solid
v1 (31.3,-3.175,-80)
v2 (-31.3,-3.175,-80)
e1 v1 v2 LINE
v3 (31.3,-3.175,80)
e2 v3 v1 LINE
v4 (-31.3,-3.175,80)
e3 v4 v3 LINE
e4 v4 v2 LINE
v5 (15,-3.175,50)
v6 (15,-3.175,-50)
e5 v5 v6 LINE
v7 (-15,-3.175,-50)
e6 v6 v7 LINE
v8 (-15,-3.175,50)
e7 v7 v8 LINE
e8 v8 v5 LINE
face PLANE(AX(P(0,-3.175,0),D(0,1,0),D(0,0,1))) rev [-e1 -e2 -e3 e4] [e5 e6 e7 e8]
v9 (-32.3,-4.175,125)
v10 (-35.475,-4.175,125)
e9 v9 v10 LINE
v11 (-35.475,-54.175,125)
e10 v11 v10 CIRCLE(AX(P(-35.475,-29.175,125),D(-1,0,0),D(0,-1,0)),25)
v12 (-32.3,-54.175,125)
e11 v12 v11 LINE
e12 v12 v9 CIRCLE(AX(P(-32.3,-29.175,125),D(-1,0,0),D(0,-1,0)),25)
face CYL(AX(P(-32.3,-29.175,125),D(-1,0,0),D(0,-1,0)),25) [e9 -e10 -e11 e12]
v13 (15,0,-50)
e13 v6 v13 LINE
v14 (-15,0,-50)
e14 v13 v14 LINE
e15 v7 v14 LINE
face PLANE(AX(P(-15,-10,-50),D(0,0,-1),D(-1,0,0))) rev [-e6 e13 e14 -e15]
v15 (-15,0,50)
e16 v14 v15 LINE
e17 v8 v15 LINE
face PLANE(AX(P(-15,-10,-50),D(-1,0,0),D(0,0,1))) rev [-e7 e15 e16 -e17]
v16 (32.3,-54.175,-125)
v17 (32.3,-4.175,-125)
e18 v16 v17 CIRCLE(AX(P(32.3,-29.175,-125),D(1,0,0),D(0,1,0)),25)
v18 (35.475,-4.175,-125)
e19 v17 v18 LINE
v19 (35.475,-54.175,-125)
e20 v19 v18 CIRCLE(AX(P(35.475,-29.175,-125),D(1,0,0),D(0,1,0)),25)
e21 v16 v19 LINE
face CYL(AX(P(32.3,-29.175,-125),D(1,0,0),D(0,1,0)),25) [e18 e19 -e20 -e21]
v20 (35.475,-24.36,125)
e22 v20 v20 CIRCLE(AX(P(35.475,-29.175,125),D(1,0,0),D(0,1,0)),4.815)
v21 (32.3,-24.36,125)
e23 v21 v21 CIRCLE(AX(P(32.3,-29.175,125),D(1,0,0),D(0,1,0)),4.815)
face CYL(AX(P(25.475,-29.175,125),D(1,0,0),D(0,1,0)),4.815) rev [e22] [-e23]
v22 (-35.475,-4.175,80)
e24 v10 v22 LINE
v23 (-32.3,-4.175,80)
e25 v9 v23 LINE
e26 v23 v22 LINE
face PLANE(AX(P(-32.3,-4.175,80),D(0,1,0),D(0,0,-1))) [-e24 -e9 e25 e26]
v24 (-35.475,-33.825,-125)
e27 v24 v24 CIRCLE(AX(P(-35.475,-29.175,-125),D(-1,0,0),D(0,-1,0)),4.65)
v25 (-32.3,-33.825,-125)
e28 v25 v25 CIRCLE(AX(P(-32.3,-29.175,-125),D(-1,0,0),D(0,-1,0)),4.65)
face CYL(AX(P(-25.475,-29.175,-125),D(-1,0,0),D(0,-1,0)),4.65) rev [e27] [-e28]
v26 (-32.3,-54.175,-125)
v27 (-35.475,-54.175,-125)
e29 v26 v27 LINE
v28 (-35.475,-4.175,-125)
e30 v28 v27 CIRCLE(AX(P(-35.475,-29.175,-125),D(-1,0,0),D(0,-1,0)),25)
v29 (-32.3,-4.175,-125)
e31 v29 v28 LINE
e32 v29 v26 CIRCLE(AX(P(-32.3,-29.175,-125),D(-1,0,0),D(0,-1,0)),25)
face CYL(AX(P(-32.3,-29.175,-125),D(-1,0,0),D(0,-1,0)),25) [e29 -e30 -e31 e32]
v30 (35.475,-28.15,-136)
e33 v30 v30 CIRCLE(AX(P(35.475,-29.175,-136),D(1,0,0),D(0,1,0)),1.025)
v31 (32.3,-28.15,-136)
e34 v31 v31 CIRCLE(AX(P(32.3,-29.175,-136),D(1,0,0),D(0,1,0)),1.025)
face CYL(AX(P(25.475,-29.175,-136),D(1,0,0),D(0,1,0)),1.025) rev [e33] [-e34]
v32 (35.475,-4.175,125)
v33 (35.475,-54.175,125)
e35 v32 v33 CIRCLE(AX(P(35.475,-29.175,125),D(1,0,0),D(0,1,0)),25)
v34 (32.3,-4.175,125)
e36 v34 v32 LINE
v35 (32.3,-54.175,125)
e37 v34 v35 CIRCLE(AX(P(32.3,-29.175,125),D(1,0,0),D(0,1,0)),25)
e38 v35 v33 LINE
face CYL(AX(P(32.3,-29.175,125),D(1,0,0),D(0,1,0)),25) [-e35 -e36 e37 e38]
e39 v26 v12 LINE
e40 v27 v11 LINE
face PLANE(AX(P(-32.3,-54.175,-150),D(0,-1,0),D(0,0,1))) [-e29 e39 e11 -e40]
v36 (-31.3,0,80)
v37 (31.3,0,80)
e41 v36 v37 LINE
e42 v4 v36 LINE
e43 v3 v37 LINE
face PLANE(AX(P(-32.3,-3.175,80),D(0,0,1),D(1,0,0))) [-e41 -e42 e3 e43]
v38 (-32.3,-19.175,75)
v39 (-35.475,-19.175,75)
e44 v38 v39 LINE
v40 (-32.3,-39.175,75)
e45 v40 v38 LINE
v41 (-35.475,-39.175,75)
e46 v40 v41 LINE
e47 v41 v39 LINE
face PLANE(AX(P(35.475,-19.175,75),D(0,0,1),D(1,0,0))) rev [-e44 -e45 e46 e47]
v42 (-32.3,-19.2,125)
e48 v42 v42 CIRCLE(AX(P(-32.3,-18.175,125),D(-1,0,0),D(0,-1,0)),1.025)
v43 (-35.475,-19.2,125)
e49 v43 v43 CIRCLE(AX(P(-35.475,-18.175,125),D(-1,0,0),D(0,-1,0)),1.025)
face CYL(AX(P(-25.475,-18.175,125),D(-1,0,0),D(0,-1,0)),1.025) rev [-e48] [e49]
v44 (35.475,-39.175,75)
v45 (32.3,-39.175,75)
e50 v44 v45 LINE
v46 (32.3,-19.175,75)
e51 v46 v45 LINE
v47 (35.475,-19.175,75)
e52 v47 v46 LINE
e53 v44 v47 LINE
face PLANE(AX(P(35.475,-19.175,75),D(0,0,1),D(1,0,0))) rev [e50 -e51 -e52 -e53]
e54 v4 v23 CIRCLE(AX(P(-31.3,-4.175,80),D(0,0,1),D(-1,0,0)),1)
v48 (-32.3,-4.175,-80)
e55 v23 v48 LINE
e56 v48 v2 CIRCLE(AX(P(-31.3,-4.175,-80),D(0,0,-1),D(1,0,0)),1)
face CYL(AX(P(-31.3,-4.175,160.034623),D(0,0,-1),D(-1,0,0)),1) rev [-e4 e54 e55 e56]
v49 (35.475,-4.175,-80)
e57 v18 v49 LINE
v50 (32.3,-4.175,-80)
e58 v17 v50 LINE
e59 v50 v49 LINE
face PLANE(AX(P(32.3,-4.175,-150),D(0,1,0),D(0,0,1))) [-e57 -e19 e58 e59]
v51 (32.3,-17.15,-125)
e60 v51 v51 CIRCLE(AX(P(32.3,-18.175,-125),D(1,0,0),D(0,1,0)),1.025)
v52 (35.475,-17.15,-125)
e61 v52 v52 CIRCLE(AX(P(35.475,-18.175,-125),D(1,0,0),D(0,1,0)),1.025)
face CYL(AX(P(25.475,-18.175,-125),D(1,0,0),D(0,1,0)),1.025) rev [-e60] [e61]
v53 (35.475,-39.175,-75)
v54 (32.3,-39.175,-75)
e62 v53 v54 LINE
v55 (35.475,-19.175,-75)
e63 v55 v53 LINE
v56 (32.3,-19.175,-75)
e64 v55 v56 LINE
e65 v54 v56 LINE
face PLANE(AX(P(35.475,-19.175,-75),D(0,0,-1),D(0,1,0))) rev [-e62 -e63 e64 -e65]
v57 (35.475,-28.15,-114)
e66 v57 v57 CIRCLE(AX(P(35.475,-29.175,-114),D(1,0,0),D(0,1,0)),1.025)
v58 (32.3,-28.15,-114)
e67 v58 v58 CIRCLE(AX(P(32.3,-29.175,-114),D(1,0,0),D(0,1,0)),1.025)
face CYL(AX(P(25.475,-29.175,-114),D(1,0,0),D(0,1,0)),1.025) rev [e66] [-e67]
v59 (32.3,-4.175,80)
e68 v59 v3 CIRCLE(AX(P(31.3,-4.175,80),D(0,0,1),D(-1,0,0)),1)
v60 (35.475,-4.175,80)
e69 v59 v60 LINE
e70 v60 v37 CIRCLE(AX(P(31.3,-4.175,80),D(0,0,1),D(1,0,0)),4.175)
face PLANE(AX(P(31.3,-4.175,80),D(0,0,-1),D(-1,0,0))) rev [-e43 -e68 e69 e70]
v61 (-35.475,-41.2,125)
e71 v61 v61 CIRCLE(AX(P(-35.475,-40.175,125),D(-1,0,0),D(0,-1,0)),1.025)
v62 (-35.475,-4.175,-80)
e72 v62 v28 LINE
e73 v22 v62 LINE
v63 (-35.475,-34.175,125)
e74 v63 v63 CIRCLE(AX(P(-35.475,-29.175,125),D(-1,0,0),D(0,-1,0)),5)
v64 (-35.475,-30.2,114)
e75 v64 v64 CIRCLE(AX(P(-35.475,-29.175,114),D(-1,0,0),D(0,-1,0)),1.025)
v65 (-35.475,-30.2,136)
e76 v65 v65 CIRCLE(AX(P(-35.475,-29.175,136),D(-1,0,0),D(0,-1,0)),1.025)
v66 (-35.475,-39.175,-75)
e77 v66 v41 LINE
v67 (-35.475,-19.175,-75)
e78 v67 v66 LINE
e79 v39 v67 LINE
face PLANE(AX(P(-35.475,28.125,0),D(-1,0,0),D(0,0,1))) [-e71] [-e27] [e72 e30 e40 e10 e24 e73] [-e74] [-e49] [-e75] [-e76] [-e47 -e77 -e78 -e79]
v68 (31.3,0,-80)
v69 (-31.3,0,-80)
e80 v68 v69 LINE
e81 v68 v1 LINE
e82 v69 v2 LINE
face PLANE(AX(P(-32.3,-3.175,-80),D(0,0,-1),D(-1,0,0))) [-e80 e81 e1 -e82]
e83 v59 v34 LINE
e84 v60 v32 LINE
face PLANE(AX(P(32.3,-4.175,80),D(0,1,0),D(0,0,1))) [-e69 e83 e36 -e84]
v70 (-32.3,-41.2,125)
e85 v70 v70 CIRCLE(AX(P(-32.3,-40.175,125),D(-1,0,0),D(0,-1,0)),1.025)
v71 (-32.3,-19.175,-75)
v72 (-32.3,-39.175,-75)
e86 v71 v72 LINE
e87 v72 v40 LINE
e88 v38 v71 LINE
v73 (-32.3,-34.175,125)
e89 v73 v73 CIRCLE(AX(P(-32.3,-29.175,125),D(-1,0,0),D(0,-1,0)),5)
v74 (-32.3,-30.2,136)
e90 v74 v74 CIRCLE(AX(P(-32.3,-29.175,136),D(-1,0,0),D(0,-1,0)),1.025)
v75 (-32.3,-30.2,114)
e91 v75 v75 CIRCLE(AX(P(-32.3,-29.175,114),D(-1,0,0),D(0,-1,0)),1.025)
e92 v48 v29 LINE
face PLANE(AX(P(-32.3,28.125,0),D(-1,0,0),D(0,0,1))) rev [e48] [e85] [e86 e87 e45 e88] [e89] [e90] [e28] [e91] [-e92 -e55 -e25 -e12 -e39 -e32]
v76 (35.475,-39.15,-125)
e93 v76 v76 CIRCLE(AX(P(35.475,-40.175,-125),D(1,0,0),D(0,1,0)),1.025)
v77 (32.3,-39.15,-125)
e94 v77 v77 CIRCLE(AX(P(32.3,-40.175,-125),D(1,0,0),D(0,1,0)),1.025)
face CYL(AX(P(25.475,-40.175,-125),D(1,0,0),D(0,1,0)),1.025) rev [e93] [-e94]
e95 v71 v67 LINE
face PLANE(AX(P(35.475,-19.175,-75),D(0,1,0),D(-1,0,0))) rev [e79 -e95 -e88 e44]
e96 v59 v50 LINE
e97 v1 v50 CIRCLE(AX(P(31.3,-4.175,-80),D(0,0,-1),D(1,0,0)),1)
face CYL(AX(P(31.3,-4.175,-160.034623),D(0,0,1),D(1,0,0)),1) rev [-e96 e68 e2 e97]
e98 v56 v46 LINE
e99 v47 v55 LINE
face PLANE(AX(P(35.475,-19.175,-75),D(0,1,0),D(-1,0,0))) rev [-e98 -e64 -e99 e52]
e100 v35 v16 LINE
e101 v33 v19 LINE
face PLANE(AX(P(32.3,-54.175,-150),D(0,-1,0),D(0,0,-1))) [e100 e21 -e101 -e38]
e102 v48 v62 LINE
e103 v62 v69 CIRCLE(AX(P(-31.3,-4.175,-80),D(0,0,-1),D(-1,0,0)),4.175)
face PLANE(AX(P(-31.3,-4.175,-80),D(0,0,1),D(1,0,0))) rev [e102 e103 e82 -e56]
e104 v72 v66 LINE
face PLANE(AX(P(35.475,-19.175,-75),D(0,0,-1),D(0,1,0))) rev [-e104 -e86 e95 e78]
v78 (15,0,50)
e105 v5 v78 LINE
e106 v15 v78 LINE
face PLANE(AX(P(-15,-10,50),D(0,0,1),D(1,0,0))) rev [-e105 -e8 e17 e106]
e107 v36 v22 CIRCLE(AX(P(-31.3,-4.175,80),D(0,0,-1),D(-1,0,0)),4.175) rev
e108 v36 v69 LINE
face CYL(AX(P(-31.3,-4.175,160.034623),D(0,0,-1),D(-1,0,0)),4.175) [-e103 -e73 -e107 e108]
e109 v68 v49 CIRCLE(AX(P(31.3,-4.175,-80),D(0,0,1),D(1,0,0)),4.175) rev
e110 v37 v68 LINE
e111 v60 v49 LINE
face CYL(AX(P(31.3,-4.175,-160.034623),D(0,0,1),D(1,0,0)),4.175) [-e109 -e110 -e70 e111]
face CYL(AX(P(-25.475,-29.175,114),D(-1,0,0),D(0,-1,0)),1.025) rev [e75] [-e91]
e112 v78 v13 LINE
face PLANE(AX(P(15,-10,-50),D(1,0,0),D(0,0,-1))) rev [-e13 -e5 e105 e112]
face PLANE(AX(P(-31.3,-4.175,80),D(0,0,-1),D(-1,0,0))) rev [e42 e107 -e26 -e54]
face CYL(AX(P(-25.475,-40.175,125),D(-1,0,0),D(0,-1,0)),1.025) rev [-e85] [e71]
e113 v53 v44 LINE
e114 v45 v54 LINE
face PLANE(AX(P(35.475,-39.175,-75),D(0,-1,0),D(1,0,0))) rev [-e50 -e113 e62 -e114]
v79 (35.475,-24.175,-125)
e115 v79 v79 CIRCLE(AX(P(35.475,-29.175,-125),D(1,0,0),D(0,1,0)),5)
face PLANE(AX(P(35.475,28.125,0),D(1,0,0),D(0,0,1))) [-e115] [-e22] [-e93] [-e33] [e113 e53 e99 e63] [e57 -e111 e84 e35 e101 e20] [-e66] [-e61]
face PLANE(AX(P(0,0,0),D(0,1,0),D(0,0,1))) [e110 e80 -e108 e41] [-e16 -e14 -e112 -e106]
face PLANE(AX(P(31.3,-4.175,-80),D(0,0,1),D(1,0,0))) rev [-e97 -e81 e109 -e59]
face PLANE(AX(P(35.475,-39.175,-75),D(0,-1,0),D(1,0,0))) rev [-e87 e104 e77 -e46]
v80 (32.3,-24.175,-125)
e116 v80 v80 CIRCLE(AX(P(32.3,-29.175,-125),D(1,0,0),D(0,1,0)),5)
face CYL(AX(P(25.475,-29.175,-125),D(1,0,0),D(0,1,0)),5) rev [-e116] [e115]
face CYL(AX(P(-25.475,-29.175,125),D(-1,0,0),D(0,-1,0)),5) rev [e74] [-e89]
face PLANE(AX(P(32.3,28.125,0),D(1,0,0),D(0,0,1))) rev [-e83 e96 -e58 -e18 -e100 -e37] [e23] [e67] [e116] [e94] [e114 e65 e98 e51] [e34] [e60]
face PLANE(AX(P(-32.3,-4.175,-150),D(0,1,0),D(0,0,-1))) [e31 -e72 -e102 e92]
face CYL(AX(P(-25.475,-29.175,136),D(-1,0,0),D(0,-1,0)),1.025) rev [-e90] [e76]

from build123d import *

# Parameters (mm, degrees)
BASE_FLANGE1_DEPTH         = 3.175
SKETCHED_START             = -150
SKETCHED_BEND1_DEPTH       = 300
SKETCHED_BEND1_2_DEPTH     = 70
SKETCHED_START_2           = 80
SKETCHED_BEND1_3_DEPTH     = 70
SKETCHED_BEND1_4_OUTLINE_W = 3.175
SKETCHED_BEND1_4_OUTLINE_H = 50
SKETCHED_BEND1_4_DEPTH     = 300
SKETCHED_START_3           = -80
SKETCHED_BEND1_5_DEPTH     = 160
SKETCH7_R                  = 4.815
CUT_EXTRUDE1_DEPTH         = 10
SKETCH8_R                  = 5
SKETCH8_R_2                = 1.025
CUT_EXTRUDE2_DEPTH         = 10
SKETCH9_R                  = 4.65
SKETCH9_R_2                = 5
SKETCH9_R_3                = 1.025
CUT_EXTRUDE3_DEPTH         = 10
CUT_EXTRUDE4_DEPTH         = 175.553238655
CUT_EXTRUDE5_DEPTH         = 175.553238655
SKETCH13_W                 = 30
SKETCH13_H                 = 100
CUT_EXTRUDE6_DEPTH         = 10
SKETCH14_W                 = 150
SKETCH14_H                 = 20
CUT_EXTRUDE7_DEPTH         = 175.553238655


# Read off the part's stored shape, not the designer's step: Sketched Bend1
# Sheet-metal steps are written as plain solids
with BuildPart() as part:
    # Sketch1 → Base-Flange1 (new body)
    with BuildSketch(Plane(origin=(0, 0, 0), x_dir=(1, 0, 0), z_dir=(0, 1, 0))):
        Polygon((-82.3, 150), (-32.3, 150), (-32.3, 80), (32.3, 80), (32.3, 150), (82.3, 150), (82.3, -150), (32.3, -150), (32.3, -80), (-32.3, -80), (-32.3, -150), (-82.3, -150), align=None)
    extrude(amount=-BASE_FLANGE1_DEPTH)

    # Sketched Bend1 outline → Sketched Bend1 (cut)
    with BuildSketch(Plane.XY.offset(SKETCHED_START)):
        with BuildLine():
            Line((-82.3, -3.175), (-35.353470735, -3.175))
            ThreePointArc((-35.353470735, -3.175), (-33.874453825, -0.888236775), (-31.3, 0))
            Line((-31.3, 0), (-82.3, 0))
            Line((-82.3, 0), (-82.3, -3.175))
        make_face()
        with BuildLine():
            Line((82.3, 0), (31.3, 0))
            ThreePointArc((31.3, 0), (33.874453825, -0.888236775), (35.353470735, -3.175))
            Line((35.353470735, -3.175), (82.3, -3.175))
            Line((82.3, -3.175), (82.3, 0))
        make_face()
    extrude(amount=SKETCHED_BEND1_DEPTH, mode=Mode.SUBTRACT)

    # Sketched Bend1 2 outline → Sketched Bend1 2 (cut)
    with BuildSketch(Plane.XY.offset(SKETCHED_START)):
        with BuildLine():
            Line((-35.353470735, -3.175), (-32.3, -3.175))
            Line((-32.3, -3.175), (-32.3, -0.121529265))
            ThreePointArc((-32.3, -0.121529265), (-34.252170811, -1.222829189), (-35.353470735, -3.175))
        make_face()
        with BuildLine():
            Line((32.3, -0.121529265), (32.3, -3.175))
            Line((32.3, -3.175), (35.353470735, -3.175))
            ThreePointArc((35.353470735, -3.175), (34.252170811, -1.222829189), (32.3, -0.121529265))
        make_face()
    extrude(amount=SKETCHED_BEND1_2_DEPTH, mode=Mode.SUBTRACT)

    # Sketched Bend1 3 outline → Sketched Bend1 3 (cut)
    with BuildSketch(Plane.XY.offset(SKETCHED_START_2)):
        with BuildLine():
            Line((-35.353470735, -3.175), (-32.3, -3.175))
            Line((-32.3, -3.175), (-32.3, -0.121529265))
            ThreePointArc((-32.3, -0.121529265), (-34.252170811, -1.222829189), (-35.353470735, -3.175))
        make_face()
        with BuildLine():
            Line((32.3, -0.121529265), (32.3, -3.175))
            Line((32.3, -3.175), (35.353470735, -3.175))
            ThreePointArc((35.353470735, -3.175), (34.252170811, -1.222829189), (32.3, -0.121529265))
        make_face()
    extrude(amount=SKETCHED_BEND1_3_DEPTH, mode=Mode.SUBTRACT)



with BuildPart() as body_2:
    # Sketched Bend1 4 outline → Sketched Bend1 4 (new body)
    with BuildSketch(Plane.XY.offset(SKETCHED_START)):
        with Locations((-33.8875, -29.175)):
            Rectangle(SKETCHED_BEND1_4_OUTLINE_W, SKETCHED_BEND1_4_OUTLINE_H)
        with Locations((33.8875, -29.175)):
            Rectangle(SKETCHED_BEND1_4_OUTLINE_W, SKETCHED_BEND1_4_OUTLINE_H)
    extrude(amount=SKETCHED_BEND1_4_DEPTH)


with BuildPart() as part_1:
    add(part.part)

    add(body_2.part)  # Sketched Bend1 5 merges body 2
    # Sketched Bend1 5 outline → Sketched Bend1 5 (add)
    with BuildSketch(Plane.XY.offset(SKETCHED_START_3)):
        with BuildLine():
            Line((-35.475, -4.175), (-32.3, -4.175))
            ThreePointArc((-32.3, -4.175), (-32.007106781, -3.467893219), (-31.3, -3.175))
            Line((-31.3, -3.175), (-35.353470735, -3.175))
            ThreePointArc((-35.353470735, -3.175), (-35.444506323, -3.671321193), (-35.475, -4.175))
        make_face()
        with BuildLine():
            Line((35.353470735, -3.175), (31.3, -3.175))
            ThreePointArc((31.3, -3.175), (32.007106781, -3.467893219), (32.3, -4.175))
            Line((32.3, -4.175), (35.475, -4.175))
            ThreePointArc((35.475, -4.175), (35.444506323, -3.671321193), (35.353470735, -3.175))
        make_face()
    extrude(amount=SKETCHED_BEND1_5_DEPTH)

    # Sketch7 → Cut-Extrude1 (cut)
    with BuildSketch(Plane(origin=(35.475, 0, 0), x_dir=(0, 0, -1), z_dir=(1, 0, 0))):
        with Locations(Location((-125, -29.175, 0), (0, 0, 90))):
            Circle(SKETCH7_R)
    extrude(amount=-CUT_EXTRUDE1_DEPTH, mode=Mode.SUBTRACT)

    # Sketch8 → Cut-Extrude2 (cut)
    with BuildSketch(Plane(origin=(35.475, 0, 0), x_dir=(0, 0, -1), z_dir=(1, 0, 0))):
        with Locations(Location((125, -29.175, 0), (0, 0, 90))):
            Circle(SKETCH8_R)
        with Locations(Location((125, -18.175, 0), (0, 0, 90))):
            Circle(SKETCH8_R_2)
        with Locations(Location((125, -40.175, 0), (0, 0, 90))):
            Circle(SKETCH8_R_2)
        with Locations(Location((136, -29.175, 0), (0, 0, 90))):
            Circle(SKETCH8_R_2)
        with Locations(Location((114, -29.175, 0), (0, 0, 90))):
            Circle(SKETCH8_R_2)
    extrude(amount=-CUT_EXTRUDE2_DEPTH, mode=Mode.SUBTRACT)

    # Sketch9 → Cut-Extrude3 (cut)
    with BuildSketch(Plane.ZY.offset(35.475)):
        with Locations(Location((-125, -29.175, 0), (0, 0, 270))):
            Circle(SKETCH9_R)
        with Locations(Location((125, -29.175, 0), (0, 0, 270))):
            Circle(SKETCH9_R_2)
        with Locations(Location((125, -18.175, 0), (0, 0, 270))):
            Circle(SKETCH9_R_3)
        with Locations(Location((114, -29.175, 0), (0, 0, 270))):
            Circle(SKETCH9_R_3)
        with Locations(Location((125, -40.175, 0), (0, 0, 270))):
            Circle(SKETCH9_R_3)
        with Locations(Location((136, -29.175, 0), (0, 0, 270))):
            Circle(SKETCH9_R_3)
    extrude(amount=-CUT_EXTRUDE3_DEPTH, mode=Mode.SUBTRACT)

    # Sketch10 → Cut-Extrude4 (cut, through all)
    with BuildSketch(Plane(origin=(35.475, 0, 0), x_dir=(0, 0, -1), z_dir=(1, 0, 0))):
        with BuildLine():
            ThreePointArc((-150, -29.175), (-142.67766953, -11.49733047), (-125, -4.175))
            Line((-125, -4.175), (-150, -4.175))
            Line((-150, -4.175), (-150, -29.175))
        make_face()
        with BuildLine():
            ThreePointArc((-125, -54.175), (-142.67766953, -46.85266953), (-150, -29.175))
            Line((-150, -29.175), (-150, -54.175))
            Line((-150, -54.175), (-125, -54.175))
        make_face()
    extrude(amount=-CUT_EXTRUDE4_DEPTH, mode=Mode.SUBTRACT)

    # Sketch11 → Cut-Extrude5 (cut, through all)
    with BuildSketch(Plane(origin=(35.475, 0, 0), x_dir=(0, 0, -1), z_dir=(1, 0, 0))):
        with BuildLine():
            Line((150, -4.175), (125, -4.175))
            ThreePointArc((125, -4.175), (142.67766953, -11.49733047), (150, -29.175))
            Line((150, -29.175), (150, -4.175))
        make_face()
        with BuildLine():
            Line((150, -54.175), (150, -29.175))
            ThreePointArc((150, -29.175), (142.67766953, -46.85266953), (125, -54.175))
            Line((125, -54.175), (150, -54.175))
        make_face()
    extrude(amount=-CUT_EXTRUDE5_DEPTH, mode=Mode.SUBTRACT)

    # Sketch13 → Cut-Extrude6 (cut)
    with BuildSketch(Plane(origin=(0, 0, 0), x_dir=(1, 0, 0), z_dir=(0, 1, 0))):
        Rectangle(SKETCH13_W, SKETCH13_H)
    extrude(amount=-CUT_EXTRUDE6_DEPTH, mode=Mode.SUBTRACT)

    # Sketch14 → Cut-Extrude7 (cut, through all)
    with BuildSketch(Plane.ZY.offset(35.475)):
        with Locations((0, -29.175)):
            Rectangle(SKETCH14_W, SKETCH14_H)
    extrude(amount=-CUT_EXTRUDE7_DEPTH, mode=Mode.SUBTRACT)


solid = part_1.part
